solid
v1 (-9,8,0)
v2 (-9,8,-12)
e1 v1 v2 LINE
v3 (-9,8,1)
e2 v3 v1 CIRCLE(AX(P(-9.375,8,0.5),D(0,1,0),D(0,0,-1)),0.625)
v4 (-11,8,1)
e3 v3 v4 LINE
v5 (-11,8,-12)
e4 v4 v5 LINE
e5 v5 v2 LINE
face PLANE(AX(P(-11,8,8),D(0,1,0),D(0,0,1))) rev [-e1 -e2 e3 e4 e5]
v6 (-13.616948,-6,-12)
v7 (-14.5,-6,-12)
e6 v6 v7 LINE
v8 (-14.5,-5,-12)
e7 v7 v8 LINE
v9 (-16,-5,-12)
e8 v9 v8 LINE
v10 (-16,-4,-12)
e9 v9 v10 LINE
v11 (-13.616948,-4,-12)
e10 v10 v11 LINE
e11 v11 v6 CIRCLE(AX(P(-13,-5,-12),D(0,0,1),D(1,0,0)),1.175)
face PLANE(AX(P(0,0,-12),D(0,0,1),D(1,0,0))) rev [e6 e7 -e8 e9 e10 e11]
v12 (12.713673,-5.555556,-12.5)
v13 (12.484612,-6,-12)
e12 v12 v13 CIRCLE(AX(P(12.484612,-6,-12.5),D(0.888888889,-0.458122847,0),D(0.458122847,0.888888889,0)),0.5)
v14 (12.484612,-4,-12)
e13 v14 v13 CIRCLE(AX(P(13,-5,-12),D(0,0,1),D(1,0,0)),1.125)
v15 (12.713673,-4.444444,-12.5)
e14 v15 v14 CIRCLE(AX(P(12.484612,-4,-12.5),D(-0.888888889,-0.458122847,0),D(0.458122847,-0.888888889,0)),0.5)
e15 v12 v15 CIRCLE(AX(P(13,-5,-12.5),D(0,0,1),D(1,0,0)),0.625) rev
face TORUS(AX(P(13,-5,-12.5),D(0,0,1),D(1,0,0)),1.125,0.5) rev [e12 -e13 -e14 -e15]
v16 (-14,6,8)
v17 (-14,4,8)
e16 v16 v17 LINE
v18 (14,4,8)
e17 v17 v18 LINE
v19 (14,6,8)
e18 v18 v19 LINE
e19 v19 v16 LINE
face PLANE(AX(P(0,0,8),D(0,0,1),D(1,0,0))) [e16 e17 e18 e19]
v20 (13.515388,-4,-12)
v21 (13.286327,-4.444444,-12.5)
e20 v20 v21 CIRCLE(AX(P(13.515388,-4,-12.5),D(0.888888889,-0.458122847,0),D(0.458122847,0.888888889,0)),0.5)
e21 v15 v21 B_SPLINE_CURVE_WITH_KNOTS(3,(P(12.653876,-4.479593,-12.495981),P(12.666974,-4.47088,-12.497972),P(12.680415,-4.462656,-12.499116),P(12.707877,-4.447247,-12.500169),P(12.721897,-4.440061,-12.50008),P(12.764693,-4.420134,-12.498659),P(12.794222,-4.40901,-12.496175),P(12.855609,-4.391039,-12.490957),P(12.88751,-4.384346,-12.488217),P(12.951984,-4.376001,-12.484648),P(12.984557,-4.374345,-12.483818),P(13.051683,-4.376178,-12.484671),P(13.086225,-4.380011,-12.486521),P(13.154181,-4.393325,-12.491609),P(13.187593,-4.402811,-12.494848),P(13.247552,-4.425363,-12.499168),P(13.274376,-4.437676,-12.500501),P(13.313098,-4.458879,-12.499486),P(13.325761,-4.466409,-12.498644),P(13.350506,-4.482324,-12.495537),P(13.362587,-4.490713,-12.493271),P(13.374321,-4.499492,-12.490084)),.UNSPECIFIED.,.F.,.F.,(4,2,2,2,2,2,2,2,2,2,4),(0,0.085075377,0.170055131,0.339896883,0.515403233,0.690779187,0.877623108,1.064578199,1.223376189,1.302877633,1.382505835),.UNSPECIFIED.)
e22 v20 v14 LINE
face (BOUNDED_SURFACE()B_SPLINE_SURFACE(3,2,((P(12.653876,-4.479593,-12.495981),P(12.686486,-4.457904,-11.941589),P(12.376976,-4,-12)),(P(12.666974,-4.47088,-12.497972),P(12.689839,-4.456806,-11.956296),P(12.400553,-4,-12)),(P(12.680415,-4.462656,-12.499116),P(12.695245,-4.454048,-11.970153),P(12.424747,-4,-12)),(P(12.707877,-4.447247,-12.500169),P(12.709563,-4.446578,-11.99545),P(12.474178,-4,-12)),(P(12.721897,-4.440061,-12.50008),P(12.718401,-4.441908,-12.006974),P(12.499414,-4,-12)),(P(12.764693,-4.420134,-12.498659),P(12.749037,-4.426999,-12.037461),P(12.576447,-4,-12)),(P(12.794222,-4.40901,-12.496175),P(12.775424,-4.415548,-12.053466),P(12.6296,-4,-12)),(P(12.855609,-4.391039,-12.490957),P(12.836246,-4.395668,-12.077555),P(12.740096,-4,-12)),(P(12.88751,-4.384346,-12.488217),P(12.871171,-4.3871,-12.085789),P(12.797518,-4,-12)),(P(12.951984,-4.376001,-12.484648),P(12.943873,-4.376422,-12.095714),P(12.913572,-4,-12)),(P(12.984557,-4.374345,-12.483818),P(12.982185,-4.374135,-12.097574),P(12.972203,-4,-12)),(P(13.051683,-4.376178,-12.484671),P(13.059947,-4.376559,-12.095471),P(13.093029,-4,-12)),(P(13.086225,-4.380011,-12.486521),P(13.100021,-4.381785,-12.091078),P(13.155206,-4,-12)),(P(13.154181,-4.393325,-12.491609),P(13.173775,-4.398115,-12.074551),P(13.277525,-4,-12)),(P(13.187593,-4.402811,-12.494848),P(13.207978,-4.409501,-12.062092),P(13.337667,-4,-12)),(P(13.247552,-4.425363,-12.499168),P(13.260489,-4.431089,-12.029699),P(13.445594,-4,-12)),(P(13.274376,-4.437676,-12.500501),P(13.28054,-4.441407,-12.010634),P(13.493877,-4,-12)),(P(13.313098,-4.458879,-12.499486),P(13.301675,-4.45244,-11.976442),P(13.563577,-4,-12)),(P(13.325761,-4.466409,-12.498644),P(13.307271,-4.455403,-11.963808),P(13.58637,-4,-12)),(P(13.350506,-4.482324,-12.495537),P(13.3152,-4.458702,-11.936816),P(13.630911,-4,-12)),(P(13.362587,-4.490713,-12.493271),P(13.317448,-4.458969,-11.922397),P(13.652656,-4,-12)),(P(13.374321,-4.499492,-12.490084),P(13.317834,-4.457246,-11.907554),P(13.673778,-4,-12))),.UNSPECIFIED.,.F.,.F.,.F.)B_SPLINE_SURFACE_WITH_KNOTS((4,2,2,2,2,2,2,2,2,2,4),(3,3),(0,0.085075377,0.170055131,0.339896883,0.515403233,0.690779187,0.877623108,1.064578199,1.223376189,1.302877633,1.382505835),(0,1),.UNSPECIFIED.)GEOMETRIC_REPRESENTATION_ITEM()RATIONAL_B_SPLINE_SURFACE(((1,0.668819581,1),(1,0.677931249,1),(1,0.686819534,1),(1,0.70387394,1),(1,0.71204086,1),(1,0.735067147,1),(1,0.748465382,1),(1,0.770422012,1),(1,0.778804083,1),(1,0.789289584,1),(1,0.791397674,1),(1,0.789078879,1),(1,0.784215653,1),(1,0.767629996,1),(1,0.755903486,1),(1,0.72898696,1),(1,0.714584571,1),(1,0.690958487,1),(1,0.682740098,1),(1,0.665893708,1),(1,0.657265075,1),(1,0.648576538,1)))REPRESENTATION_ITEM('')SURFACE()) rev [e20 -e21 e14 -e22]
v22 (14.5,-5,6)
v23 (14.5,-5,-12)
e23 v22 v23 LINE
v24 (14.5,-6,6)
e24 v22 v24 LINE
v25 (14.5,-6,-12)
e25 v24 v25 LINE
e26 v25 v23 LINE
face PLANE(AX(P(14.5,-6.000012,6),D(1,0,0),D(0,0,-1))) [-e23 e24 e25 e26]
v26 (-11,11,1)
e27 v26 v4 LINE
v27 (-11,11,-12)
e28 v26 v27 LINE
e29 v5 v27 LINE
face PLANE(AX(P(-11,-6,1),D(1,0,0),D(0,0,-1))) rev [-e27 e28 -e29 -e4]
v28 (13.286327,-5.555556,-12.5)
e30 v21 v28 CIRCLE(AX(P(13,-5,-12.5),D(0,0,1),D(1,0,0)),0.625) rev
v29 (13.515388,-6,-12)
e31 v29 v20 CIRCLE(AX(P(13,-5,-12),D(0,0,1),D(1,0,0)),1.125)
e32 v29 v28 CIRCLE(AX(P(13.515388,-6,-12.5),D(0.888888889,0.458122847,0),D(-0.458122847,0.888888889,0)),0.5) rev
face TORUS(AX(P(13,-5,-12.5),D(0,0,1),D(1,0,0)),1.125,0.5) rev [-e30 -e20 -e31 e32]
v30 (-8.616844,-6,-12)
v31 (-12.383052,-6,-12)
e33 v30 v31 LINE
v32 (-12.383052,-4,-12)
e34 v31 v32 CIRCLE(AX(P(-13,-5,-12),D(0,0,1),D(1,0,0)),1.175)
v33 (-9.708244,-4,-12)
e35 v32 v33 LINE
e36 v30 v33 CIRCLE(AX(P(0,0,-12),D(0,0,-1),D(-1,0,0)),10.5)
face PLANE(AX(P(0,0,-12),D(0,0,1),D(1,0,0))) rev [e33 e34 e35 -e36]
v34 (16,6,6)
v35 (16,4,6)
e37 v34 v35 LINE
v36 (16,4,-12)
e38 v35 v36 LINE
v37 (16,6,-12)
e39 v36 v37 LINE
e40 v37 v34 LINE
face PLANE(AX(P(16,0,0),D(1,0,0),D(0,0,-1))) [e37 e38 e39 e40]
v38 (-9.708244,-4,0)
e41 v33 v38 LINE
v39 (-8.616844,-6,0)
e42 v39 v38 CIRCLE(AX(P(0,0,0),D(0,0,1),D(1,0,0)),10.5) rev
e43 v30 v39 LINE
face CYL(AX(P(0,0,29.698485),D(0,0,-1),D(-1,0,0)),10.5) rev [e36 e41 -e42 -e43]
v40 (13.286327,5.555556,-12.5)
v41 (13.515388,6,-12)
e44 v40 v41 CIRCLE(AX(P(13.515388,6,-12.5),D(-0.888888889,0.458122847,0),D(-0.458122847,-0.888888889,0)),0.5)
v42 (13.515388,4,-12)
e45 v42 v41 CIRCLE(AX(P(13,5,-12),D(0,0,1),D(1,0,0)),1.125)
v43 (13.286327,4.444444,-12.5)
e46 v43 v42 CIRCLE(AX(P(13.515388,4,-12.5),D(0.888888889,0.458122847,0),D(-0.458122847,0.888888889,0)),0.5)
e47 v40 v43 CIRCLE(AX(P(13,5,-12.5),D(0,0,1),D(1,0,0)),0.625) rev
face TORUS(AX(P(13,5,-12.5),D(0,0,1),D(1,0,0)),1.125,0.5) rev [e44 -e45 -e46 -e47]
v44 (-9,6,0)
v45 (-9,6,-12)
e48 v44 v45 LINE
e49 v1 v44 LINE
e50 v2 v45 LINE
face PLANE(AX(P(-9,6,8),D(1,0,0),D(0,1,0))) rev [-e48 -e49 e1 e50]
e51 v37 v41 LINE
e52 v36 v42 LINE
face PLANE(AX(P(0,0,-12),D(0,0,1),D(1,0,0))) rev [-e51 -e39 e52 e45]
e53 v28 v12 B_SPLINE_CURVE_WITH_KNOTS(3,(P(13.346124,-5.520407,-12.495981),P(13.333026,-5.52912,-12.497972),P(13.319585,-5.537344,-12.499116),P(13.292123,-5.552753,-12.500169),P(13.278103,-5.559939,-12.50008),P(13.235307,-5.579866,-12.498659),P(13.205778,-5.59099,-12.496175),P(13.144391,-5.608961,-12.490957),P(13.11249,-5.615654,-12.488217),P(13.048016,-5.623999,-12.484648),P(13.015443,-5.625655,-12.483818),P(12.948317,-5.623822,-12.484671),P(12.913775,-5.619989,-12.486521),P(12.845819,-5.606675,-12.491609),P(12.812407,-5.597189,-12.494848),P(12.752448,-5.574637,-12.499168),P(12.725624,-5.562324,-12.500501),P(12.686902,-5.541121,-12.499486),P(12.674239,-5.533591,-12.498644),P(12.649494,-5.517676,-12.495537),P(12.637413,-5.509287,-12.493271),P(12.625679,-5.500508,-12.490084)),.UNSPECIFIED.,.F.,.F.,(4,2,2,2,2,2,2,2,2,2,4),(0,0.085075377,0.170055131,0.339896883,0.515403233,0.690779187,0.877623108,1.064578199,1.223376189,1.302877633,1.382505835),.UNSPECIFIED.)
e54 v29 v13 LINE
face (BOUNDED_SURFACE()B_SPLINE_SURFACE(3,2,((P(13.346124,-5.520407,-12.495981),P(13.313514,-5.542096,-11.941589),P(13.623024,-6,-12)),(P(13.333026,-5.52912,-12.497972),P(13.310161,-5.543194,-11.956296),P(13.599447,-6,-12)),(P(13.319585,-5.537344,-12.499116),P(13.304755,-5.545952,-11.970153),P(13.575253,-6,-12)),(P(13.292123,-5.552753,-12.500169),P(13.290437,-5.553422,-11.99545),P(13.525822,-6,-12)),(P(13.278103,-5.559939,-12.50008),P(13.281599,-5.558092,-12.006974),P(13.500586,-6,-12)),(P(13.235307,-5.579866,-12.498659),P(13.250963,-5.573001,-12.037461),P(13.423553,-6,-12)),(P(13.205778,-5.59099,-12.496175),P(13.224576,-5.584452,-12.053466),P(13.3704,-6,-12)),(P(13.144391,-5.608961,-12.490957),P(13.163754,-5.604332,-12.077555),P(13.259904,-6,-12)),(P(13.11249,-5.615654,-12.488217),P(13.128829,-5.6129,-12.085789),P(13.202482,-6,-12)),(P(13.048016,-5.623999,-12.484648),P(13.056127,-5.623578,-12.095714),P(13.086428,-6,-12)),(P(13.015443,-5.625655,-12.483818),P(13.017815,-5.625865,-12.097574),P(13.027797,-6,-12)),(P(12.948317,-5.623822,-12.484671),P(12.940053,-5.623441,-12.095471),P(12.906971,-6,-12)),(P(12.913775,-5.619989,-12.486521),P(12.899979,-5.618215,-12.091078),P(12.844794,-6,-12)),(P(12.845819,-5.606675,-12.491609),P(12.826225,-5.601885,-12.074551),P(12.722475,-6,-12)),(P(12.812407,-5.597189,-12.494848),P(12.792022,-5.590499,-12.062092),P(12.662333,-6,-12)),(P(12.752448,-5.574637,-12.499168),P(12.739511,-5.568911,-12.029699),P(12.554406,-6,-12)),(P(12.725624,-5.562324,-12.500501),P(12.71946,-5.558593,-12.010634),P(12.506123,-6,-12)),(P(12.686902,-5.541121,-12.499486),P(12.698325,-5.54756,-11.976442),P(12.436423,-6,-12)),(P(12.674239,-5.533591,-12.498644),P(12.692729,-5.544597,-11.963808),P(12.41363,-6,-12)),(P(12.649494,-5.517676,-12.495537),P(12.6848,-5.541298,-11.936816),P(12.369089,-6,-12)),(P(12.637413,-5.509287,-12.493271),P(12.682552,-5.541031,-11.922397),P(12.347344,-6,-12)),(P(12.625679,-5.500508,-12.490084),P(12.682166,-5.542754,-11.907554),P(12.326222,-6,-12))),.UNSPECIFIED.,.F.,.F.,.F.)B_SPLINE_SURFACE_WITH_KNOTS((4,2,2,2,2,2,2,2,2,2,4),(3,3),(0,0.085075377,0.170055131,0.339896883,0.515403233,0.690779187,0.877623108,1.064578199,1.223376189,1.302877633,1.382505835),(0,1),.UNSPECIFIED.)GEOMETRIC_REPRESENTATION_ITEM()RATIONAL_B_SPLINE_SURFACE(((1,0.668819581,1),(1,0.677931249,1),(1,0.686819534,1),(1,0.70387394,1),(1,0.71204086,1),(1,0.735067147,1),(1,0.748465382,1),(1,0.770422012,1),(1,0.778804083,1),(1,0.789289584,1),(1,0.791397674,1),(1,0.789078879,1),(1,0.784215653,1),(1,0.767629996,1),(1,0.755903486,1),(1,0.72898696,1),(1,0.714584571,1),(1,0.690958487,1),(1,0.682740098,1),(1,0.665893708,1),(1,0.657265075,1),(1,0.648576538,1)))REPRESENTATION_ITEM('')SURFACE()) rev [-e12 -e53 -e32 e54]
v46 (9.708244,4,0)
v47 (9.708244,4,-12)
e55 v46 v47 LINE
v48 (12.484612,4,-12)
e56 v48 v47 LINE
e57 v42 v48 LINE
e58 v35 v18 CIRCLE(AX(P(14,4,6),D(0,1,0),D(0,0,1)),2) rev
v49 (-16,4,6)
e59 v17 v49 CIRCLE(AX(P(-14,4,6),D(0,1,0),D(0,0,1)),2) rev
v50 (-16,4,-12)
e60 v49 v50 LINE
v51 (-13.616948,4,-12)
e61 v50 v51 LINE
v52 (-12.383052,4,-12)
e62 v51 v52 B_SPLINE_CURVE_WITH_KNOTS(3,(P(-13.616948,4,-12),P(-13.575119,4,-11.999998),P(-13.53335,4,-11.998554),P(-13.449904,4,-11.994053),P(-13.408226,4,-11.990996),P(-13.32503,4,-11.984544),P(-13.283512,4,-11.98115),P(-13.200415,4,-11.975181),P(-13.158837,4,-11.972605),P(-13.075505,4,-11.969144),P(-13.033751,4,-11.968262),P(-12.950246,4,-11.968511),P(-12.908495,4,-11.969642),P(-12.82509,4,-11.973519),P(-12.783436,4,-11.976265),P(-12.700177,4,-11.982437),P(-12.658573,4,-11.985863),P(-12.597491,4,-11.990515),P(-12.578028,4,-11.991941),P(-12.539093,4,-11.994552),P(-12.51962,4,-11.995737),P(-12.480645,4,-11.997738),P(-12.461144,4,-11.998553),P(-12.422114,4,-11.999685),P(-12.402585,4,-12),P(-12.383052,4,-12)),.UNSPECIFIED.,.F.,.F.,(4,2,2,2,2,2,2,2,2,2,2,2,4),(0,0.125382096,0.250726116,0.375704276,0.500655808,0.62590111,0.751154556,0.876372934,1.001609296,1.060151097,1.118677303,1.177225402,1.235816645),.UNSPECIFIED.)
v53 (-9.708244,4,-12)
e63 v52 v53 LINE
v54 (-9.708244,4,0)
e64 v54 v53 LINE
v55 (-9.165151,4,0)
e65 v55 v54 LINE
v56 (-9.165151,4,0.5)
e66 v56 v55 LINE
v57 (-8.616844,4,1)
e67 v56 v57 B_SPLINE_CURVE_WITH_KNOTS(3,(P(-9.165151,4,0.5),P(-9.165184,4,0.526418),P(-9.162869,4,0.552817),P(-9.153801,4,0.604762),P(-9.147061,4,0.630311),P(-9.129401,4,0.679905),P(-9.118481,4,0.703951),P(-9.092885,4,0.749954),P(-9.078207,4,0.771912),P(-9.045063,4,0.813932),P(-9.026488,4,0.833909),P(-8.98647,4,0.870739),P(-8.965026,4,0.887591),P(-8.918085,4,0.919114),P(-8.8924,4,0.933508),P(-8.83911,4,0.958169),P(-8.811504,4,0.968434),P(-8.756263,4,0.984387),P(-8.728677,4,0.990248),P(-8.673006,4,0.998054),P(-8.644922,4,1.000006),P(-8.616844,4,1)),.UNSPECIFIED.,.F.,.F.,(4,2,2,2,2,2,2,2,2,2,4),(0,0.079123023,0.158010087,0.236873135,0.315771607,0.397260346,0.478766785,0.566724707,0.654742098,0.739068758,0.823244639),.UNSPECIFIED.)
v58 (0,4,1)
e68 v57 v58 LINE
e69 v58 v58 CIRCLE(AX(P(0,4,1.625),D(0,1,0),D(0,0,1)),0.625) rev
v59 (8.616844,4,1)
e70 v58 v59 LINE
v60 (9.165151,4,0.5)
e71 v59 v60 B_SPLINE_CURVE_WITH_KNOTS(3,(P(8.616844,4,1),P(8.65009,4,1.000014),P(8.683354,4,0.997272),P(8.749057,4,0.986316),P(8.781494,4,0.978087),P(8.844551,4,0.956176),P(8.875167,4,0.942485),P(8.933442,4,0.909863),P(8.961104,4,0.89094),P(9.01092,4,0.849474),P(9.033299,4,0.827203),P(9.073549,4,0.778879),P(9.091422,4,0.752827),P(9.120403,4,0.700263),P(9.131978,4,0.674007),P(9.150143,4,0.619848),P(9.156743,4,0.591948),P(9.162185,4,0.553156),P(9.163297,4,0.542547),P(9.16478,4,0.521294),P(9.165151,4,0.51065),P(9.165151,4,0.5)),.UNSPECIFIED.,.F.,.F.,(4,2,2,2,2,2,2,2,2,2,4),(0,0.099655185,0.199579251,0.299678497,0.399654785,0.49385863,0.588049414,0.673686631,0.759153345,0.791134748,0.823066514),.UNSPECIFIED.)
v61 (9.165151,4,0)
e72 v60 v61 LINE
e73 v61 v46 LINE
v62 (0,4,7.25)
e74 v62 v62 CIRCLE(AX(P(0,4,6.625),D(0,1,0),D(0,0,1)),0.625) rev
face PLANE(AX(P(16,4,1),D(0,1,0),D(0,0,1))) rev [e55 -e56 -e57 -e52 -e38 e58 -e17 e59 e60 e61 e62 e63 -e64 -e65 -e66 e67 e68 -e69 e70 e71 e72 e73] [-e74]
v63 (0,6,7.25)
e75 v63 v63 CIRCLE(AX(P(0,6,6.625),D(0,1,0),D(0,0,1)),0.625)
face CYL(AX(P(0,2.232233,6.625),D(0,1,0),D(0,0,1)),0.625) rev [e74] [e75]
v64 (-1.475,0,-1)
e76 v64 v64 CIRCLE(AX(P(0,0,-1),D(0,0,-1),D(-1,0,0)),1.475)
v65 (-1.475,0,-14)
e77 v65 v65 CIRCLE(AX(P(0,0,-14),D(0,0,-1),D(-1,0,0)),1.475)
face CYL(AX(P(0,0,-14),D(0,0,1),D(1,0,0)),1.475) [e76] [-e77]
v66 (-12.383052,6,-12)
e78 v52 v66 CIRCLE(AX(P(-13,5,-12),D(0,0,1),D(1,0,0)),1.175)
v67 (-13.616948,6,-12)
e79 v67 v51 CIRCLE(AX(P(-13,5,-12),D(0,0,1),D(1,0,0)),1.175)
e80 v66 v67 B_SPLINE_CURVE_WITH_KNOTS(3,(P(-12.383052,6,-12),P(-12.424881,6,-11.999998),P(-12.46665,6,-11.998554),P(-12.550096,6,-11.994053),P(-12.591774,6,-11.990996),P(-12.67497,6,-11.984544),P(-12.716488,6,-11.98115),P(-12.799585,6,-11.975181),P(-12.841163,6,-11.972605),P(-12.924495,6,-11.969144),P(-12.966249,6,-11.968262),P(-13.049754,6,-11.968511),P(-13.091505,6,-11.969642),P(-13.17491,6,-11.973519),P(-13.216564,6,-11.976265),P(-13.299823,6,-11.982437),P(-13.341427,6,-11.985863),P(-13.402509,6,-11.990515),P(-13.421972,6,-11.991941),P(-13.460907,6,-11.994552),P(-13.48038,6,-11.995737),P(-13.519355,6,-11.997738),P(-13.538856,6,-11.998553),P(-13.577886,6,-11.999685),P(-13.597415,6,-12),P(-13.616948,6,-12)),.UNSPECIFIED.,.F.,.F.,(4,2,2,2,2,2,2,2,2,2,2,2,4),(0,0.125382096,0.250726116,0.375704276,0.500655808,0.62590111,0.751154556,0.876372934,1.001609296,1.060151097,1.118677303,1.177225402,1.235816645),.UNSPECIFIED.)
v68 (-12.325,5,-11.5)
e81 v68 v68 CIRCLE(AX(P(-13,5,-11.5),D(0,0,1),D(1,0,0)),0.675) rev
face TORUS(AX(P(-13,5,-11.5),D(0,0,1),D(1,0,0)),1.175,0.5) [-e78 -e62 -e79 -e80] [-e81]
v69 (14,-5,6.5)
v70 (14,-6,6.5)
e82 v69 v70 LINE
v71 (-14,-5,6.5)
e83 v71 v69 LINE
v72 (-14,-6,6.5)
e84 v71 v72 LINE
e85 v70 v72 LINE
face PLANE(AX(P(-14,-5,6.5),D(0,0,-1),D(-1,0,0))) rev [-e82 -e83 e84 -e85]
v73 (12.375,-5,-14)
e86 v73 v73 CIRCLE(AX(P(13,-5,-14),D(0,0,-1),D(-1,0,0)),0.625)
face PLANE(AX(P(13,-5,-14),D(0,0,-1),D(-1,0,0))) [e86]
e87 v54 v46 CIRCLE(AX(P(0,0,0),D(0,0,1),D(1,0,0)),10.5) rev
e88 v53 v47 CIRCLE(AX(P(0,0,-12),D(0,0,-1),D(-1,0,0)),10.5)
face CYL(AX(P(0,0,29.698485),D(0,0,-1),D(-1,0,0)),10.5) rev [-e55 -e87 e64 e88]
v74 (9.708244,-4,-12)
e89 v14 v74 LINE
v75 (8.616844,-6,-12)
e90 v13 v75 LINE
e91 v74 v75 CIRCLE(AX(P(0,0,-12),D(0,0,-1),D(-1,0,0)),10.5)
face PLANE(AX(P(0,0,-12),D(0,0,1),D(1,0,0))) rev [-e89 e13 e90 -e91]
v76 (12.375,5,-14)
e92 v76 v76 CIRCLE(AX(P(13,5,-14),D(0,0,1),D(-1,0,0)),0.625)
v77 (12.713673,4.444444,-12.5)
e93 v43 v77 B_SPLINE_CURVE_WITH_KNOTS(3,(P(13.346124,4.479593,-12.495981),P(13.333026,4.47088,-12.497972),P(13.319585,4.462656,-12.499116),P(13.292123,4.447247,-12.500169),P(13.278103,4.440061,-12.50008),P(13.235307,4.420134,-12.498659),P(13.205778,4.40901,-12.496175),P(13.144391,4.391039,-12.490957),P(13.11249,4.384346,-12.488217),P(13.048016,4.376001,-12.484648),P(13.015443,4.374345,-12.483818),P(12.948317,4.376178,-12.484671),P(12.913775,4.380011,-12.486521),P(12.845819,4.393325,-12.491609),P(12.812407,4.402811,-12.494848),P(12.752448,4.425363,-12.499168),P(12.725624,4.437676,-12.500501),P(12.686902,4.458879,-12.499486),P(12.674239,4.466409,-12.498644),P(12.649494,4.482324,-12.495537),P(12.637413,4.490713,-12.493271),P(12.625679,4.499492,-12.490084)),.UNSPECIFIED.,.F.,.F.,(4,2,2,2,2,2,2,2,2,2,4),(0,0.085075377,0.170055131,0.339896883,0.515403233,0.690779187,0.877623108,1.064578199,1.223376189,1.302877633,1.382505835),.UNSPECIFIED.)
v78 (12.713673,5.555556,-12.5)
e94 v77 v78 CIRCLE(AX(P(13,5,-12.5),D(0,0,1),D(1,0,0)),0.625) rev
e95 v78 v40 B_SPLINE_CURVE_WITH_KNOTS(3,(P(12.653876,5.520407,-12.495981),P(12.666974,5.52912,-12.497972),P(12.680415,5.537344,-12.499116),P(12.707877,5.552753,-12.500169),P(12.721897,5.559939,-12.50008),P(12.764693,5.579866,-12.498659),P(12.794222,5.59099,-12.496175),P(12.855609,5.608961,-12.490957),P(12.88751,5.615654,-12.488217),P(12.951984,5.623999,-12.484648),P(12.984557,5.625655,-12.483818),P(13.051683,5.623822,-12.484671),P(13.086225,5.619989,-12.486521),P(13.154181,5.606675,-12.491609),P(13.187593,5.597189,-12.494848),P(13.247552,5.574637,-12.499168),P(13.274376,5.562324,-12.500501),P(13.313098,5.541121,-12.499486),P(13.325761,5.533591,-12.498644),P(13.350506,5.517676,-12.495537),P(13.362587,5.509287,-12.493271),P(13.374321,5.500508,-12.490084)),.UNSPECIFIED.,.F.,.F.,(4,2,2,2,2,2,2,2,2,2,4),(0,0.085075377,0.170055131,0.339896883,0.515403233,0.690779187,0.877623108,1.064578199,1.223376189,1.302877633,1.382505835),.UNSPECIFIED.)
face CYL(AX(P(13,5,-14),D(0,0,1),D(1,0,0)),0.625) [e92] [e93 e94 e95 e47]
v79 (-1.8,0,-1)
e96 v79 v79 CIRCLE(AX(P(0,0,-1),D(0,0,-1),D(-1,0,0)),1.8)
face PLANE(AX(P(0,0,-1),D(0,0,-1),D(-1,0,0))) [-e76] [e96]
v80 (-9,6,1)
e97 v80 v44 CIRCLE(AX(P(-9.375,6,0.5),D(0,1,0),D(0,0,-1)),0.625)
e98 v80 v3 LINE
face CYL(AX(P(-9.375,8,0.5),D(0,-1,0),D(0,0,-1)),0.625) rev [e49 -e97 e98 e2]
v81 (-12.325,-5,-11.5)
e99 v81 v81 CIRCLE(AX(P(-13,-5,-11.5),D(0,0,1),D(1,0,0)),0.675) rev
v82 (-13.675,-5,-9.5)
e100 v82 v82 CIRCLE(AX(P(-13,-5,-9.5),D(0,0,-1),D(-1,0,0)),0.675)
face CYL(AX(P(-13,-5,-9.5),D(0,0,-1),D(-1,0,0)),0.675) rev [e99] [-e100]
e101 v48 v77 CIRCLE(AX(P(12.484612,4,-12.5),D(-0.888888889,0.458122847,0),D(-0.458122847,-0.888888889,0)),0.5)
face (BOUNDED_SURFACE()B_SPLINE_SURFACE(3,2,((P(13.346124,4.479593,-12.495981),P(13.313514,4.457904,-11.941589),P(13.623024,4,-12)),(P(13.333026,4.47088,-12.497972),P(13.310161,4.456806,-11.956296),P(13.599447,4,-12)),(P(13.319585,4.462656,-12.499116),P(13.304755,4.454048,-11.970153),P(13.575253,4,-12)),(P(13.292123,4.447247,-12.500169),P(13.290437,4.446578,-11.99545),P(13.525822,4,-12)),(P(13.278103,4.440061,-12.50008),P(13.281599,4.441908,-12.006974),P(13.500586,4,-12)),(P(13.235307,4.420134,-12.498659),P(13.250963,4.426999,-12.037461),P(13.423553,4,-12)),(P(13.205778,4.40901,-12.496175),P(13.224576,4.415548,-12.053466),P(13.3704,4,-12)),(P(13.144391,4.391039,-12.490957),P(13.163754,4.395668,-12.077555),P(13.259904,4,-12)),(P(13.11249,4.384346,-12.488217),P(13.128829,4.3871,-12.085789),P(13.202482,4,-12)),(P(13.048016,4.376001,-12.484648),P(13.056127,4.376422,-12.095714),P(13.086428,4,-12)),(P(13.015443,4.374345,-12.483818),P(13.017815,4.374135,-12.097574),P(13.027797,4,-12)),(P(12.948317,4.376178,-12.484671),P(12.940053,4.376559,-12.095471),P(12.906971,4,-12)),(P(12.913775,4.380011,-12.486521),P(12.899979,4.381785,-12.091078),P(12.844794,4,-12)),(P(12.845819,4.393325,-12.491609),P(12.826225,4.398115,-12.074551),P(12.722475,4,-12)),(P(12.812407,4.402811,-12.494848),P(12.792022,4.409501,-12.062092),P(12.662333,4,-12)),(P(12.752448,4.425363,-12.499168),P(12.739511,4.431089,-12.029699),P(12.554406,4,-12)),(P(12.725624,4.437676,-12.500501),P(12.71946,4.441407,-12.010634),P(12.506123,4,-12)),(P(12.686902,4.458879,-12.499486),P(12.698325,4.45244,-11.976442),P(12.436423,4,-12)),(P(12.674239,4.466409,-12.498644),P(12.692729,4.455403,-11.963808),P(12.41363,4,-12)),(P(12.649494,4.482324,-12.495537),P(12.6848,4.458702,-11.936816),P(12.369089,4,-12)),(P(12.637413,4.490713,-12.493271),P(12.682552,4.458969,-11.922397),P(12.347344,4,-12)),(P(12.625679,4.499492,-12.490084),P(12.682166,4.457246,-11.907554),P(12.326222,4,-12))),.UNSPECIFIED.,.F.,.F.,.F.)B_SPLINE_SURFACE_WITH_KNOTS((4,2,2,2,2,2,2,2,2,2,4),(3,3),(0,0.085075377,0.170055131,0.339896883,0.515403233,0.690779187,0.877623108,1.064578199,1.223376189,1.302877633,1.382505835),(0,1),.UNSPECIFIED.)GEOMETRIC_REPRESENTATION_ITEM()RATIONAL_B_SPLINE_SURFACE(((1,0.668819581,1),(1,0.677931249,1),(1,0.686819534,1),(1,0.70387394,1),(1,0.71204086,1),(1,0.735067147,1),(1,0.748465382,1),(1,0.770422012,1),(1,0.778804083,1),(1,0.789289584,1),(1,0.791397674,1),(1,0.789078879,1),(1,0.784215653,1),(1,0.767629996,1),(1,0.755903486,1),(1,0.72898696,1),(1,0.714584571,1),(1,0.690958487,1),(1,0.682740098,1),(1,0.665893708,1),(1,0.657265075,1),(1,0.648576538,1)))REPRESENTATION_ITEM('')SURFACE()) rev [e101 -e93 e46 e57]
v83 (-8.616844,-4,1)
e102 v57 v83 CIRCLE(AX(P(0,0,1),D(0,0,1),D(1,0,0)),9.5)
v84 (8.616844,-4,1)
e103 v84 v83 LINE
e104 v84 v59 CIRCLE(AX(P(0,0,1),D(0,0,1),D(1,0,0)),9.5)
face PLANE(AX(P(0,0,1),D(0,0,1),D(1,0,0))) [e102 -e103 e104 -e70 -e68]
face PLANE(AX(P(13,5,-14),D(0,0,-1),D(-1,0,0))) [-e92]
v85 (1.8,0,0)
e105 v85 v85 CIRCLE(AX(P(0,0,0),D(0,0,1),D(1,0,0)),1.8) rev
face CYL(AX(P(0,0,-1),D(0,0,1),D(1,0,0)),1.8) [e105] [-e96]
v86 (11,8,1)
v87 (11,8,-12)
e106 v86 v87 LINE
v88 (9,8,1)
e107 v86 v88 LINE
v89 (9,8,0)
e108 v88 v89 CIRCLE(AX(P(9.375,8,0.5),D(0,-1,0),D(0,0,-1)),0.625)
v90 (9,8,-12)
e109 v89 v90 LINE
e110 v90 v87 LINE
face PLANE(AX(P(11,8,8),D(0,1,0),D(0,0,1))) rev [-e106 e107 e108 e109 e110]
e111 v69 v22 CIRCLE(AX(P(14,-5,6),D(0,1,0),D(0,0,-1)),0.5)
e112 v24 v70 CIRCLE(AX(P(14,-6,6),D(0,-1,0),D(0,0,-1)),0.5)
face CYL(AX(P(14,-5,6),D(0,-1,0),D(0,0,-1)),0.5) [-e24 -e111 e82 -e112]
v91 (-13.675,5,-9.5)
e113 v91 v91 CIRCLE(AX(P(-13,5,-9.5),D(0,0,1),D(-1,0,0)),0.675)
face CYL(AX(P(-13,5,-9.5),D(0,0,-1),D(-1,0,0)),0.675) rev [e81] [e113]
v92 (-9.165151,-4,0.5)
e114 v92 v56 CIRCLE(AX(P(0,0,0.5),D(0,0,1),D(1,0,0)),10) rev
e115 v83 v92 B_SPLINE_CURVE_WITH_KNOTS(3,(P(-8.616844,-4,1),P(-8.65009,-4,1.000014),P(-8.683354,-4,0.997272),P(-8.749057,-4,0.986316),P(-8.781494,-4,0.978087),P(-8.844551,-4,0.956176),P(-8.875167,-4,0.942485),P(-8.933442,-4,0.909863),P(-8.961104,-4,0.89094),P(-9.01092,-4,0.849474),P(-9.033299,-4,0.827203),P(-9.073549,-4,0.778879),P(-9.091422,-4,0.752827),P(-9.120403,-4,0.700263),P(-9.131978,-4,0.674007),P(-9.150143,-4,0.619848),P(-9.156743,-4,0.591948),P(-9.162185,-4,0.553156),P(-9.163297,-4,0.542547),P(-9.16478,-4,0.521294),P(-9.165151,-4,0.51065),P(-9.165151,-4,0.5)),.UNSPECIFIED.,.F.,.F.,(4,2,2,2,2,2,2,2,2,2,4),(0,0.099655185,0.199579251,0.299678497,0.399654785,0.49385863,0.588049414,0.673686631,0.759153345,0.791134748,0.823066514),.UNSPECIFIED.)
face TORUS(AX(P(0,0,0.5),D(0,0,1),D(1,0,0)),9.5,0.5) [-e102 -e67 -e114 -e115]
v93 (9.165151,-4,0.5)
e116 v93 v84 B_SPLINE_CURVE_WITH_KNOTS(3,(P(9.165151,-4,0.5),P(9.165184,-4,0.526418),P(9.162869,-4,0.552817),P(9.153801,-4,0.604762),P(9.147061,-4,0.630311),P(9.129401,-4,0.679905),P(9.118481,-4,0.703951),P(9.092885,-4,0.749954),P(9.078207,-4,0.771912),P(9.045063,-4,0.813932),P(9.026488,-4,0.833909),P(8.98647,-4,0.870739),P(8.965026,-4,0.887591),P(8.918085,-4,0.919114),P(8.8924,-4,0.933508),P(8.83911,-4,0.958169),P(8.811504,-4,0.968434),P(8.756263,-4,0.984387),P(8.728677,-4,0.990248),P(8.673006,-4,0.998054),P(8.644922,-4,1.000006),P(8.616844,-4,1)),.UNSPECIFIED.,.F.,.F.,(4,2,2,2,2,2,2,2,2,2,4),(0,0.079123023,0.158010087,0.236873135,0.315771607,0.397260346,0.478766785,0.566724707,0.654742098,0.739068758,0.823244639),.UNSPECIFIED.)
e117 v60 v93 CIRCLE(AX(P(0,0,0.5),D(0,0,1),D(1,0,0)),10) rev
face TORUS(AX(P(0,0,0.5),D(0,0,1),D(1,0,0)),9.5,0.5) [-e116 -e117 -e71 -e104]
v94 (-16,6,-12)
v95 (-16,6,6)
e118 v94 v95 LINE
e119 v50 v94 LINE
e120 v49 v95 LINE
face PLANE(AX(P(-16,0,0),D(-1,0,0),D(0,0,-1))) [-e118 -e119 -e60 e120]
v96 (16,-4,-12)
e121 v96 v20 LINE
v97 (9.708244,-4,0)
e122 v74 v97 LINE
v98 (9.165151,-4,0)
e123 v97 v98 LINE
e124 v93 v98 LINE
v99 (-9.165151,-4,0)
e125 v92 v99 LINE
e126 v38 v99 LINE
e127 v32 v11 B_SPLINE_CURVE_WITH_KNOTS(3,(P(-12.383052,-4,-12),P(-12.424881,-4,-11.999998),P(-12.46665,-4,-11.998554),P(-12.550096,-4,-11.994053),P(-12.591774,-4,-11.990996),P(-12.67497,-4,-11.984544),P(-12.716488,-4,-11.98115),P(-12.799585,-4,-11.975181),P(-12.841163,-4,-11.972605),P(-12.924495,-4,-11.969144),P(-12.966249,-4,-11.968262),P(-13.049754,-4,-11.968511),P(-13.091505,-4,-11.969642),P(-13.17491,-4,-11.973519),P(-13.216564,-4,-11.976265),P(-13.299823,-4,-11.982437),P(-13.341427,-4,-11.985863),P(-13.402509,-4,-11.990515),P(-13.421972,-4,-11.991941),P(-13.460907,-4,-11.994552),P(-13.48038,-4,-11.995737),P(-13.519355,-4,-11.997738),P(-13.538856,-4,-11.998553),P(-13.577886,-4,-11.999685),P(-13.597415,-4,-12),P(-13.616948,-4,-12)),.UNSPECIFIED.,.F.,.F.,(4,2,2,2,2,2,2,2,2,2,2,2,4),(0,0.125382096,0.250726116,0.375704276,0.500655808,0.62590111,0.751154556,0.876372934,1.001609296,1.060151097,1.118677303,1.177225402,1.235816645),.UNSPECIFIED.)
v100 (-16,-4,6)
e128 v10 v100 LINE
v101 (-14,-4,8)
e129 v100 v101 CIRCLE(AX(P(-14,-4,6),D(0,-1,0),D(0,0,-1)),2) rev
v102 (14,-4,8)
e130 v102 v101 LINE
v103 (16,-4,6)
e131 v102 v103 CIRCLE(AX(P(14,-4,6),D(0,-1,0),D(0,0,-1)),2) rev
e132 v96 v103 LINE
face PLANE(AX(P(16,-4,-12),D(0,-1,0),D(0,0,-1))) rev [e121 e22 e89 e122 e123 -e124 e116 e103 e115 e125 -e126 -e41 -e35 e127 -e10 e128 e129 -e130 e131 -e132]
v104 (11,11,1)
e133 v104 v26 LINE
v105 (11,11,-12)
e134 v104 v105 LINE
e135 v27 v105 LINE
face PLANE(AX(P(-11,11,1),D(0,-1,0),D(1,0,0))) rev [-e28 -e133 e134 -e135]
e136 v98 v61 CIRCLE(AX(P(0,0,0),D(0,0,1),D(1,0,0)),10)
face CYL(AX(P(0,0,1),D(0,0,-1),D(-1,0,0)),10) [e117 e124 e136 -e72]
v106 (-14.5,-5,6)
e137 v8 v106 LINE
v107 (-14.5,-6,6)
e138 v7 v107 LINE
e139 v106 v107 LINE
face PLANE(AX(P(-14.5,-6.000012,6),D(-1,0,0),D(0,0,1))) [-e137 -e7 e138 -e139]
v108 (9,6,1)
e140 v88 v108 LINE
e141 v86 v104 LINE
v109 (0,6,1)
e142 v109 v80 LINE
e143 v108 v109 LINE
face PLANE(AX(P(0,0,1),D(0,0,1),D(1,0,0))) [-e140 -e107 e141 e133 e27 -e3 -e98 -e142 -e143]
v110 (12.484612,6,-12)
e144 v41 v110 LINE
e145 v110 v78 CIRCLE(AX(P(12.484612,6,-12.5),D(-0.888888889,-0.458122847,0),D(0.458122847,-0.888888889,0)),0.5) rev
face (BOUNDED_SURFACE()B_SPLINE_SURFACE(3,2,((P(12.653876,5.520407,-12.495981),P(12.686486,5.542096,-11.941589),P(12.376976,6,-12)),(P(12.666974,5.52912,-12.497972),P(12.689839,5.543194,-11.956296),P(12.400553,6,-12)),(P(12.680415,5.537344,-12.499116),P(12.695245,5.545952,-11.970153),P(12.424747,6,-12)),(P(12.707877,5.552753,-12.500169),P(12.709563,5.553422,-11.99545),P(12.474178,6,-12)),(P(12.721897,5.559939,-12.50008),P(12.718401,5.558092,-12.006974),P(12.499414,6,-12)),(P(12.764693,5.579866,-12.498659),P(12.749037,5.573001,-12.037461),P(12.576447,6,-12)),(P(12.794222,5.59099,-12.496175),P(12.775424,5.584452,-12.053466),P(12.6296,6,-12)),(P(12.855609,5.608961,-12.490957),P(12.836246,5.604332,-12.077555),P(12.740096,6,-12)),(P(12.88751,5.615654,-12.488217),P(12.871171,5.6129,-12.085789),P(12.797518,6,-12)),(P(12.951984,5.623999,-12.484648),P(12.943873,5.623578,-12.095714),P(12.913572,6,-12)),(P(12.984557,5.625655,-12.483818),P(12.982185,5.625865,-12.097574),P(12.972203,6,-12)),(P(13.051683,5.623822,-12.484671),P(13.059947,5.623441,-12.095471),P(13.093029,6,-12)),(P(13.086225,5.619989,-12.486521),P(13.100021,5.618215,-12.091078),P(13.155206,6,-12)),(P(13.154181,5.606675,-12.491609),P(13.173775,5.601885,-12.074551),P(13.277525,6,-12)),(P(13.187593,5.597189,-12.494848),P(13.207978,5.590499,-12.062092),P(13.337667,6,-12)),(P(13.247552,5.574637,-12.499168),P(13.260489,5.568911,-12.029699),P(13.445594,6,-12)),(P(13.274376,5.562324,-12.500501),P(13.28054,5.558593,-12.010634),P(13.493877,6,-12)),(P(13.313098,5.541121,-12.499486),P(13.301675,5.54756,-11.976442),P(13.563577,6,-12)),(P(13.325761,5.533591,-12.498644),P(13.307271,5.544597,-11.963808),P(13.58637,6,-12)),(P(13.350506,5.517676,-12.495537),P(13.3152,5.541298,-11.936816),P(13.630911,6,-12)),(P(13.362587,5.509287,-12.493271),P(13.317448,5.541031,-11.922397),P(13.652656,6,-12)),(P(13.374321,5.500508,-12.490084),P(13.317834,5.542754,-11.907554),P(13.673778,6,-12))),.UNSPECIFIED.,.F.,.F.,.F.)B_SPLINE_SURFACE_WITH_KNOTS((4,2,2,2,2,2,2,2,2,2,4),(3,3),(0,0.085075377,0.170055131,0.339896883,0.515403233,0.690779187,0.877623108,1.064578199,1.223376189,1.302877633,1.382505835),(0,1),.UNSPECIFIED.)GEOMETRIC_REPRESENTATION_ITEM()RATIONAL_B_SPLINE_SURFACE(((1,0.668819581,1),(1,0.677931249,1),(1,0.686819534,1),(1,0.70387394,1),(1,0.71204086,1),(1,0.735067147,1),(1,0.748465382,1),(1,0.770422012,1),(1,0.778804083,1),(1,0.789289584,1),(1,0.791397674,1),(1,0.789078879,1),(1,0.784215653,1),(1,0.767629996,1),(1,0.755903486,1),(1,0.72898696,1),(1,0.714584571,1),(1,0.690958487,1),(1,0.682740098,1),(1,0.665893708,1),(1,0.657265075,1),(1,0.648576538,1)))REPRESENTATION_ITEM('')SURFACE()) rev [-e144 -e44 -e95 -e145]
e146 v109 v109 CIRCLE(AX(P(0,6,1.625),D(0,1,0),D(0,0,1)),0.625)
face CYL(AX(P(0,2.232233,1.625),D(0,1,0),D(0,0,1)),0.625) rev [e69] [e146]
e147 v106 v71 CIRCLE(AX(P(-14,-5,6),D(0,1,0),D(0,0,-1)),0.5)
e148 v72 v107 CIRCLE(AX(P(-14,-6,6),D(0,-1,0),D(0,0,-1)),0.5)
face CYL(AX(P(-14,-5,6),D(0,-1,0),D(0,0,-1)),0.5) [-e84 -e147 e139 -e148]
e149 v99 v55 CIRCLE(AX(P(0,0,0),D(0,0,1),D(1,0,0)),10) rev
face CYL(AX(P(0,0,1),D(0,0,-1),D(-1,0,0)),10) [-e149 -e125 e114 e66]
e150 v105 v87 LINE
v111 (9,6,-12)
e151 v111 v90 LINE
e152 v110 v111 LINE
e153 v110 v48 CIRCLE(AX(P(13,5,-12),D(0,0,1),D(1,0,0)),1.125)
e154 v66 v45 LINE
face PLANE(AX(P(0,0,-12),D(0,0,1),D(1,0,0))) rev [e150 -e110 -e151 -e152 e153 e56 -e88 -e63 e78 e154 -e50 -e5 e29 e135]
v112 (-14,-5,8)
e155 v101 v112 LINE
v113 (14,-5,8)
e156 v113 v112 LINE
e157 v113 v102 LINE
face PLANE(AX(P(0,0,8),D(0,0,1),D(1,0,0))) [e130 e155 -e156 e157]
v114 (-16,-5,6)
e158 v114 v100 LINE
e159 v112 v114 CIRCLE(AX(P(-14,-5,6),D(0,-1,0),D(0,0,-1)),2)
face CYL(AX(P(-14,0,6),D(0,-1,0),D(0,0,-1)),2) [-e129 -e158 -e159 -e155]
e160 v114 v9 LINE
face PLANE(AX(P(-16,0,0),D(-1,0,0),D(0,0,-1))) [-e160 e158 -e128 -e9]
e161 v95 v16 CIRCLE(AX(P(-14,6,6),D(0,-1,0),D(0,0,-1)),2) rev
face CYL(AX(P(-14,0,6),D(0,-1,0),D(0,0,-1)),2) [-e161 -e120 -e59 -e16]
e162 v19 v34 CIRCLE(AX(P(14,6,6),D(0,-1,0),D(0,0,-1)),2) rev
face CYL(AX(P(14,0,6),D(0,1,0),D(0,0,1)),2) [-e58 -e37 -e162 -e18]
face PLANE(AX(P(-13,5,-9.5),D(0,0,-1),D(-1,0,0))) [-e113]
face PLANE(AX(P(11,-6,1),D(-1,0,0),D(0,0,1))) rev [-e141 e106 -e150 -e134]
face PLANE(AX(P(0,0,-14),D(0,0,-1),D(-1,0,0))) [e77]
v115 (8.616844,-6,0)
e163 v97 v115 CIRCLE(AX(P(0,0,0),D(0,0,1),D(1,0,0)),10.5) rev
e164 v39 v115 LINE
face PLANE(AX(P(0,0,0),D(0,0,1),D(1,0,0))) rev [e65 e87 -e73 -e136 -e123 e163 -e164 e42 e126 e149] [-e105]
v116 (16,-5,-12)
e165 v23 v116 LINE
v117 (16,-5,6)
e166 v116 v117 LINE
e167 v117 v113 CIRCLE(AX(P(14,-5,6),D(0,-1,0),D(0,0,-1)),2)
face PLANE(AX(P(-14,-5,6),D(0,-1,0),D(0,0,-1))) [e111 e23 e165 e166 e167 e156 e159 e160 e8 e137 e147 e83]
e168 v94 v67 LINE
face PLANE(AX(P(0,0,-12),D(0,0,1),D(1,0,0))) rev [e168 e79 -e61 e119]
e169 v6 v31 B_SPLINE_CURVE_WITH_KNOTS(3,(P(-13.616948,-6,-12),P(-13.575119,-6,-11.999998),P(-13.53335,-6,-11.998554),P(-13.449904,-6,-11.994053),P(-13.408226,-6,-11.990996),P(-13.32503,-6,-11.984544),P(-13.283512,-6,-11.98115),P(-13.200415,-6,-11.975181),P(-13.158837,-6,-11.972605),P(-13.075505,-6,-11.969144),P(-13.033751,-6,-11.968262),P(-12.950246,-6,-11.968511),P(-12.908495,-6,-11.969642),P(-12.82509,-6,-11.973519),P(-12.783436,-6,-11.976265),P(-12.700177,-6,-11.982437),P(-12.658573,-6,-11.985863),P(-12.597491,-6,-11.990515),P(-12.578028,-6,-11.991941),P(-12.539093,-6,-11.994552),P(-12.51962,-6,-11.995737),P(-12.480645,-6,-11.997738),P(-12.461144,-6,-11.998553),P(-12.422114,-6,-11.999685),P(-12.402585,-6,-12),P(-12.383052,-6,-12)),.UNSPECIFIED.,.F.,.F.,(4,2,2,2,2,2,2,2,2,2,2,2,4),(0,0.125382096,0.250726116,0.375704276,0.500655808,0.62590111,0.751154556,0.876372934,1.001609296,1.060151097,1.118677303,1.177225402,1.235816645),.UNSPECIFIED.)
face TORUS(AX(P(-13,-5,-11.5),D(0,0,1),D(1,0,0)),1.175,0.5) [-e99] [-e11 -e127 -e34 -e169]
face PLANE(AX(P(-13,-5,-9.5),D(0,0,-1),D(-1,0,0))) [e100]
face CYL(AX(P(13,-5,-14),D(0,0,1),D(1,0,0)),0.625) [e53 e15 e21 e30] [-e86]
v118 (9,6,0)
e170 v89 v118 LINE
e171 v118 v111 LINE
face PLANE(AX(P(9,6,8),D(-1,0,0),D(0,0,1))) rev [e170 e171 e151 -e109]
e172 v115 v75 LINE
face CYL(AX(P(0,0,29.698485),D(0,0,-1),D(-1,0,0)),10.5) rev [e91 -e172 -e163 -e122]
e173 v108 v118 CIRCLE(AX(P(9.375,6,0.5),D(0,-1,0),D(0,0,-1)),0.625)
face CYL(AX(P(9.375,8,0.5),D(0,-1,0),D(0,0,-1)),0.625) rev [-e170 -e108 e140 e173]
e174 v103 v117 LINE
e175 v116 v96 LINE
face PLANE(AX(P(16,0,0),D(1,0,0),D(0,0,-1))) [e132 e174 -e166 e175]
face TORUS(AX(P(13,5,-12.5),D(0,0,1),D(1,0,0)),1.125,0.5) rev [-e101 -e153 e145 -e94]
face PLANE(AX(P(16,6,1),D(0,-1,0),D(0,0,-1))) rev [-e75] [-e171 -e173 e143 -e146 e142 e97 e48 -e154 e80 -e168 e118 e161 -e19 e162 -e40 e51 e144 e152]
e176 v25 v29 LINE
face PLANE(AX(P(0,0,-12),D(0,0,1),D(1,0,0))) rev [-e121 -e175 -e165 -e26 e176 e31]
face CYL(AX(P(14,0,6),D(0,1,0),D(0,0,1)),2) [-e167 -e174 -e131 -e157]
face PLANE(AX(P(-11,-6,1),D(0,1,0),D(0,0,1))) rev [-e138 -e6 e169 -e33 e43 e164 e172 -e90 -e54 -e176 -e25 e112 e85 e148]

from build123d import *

# Parameters (mm, degrees)
BOSS_EXTRUDE1_DEPTH     = 1
SKETCH2_R               = 1.475
BOSS_EXTRUDE2_DEPTH     = 14
SKETCH3_R               = 1.8
BOSS_EXTRUDE3_DEPTH     = 1
SKETCH4_W               = 2
SKETCH4_H               = 17
BOSS_EXTRUDE4_DEPTH     = 12
SKETCH5_W               = 18
SKETCH5_H               = 2
BOSS_EXTRUDE5_DEPTH     = 12
SKETCH6_W               = 13
SKETCH6_H               = 2
BOSS_EXTRUDE6_DEPTH     = 5
BOSS_EXTRUDE7_DEPTH     = 12
CUT_EXTRUDE1_DEPTH      = 24.366642891
SKETCH9_W               = 2.937742252
SKETCH9_H               = 8
CUT_EXTRUDE2_DEPTH      = 12
CUT_EXTRUDE11_START     = -12
SKETCH21_R              = 10.5
SKETCH21_R_2            = 1.8
CUT_EXTRUDE11_DEPTH     = 12
SKETCH10_W              = 32
SKETCH10_H              = 2
BOSS_EXTRUDE8_DEPTH     = 7
FILLET1_R               = 0.5
SKETCH11_R              = 0.625
BOSS_EXTRUDE9_DEPTH     = 2
SKETCH14_W              = 2
SKETCH14_H              = 2
CUT_EXTRUDE5_DEPTH      = 28.874719859
SKETCH12_R              = 0.675
CUT_EXTRUDE3_DEPTH      = 2.5
CUT_EXTRUDE6_DEPTH      = 2
FILLET2_R               = 0.5
FILLET3_R               = 0.5
FILLET4_R               = 2
CUT_EXTRUDE7_DEPTH      = 28.221315288
CUT_EXTRUDE7_DEPTH_BACK = 1
SKETCH19_R              = 0.625
CUT_EXTRUDE9_DEPTH      = 2


with BuildPart() as part:
    # Sketch1 → Boss-Extrude1 (new body)
    with BuildSketch(Plane.XY):
        Polygon((-11, 6), (-11, 11), (11, 11), (11, 6), (11, -6), (-11, -6), align=None)
    extrude(amount=BOSS_EXTRUDE1_DEPTH)

    # Sketch2 → Boss-Extrude2 (add)
    with BuildSketch(Plane(origin=(0, 0, 0), x_dir=(-1, 0, 0), z_dir=(0, 0, -1))):
        with Locations(Location((0, 0, 0), (0, 0, 180))):
            Circle(SKETCH2_R)
    extrude(amount=BOSS_EXTRUDE2_DEPTH)

    # Sketch3 → Boss-Extrude3 (add)
    with BuildSketch(Plane(origin=(0, 0, 0), x_dir=(-1, 0, 0), z_dir=(0, 0, -1))):
        with Locations(Location((0, 0, 0), (0, 0, 180))):
            Circle(SKETCH3_R)
    extrude(amount=BOSS_EXTRUDE3_DEPTH)

    # Sketch4 → Boss-Extrude4 (add)
    with BuildSketch(Plane(origin=(0, 0, 0), x_dir=(-1, 0, 0), z_dir=(0, 0, -1))):
        with Locations((10, 2.5)):
            Rectangle(SKETCH4_W, SKETCH4_H)
        with Locations((-10, 2.5)):
            Rectangle(SKETCH4_W, SKETCH4_H)
    extrude(amount=BOSS_EXTRUDE4_DEPTH)

    # Sketch5 → Boss-Extrude5 (add)
    with BuildSketch(Plane(origin=(0, 0, 0), x_dir=(-1, 0, 0), z_dir=(0, 0, -1))):
        with Locations((0, 10)):
            Rectangle(SKETCH5_W, SKETCH5_H)
    extrude(amount=BOSS_EXTRUDE5_DEPTH)

    # Sketch6 → Boss-Extrude6 (add)
    with BuildSketch(Plane(origin=(11, 0, 0), x_dir=(0, 0, -1), z_dir=(1, 0, 0))):
        with Locations((5.5, -5)):
            Rectangle(SKETCH6_W, SKETCH6_H)
        with Locations((5.5, 5)):
            Rectangle(SKETCH6_W, SKETCH6_H)
    boss_extrude6 = extrude(amount=BOSS_EXTRUDE6_DEPTH)

    # Mirror1: Boss-Extrude6 across plane
    add(boss_extrude6.mirror(Plane(origin=(0, 0, 0), x_dir=(0, 0, 1), z_dir=(1, 0, 0))))

    # Sketch7 → Boss-Extrude7 (add)
    with BuildSketch(Plane(origin=(0, 0, -12), x_dir=(-1, 0, 0), z_dir=(0, 0, -1))):
        with BuildLine():
            ThreePointArc((-6.708203932, -6), (-8.407551231, -3.211398808), (-9, 0))
            Line((-9, 0), (-9, -6))
            Line((-9, -6), (-6.708203932, -6))
        make_face()
        with BuildLine():
            Line((-9, 9), (-9, 0))
            ThreePointArc((-9, 0), (-6.363961031, 6.363961031), (0, 9))
            Line((0, 9), (-9, 9))
        make_face()
    boss_extrude7 = extrude(amount=-BOSS_EXTRUDE7_DEPTH)

    # Sketch8 → Cut-Extrude1 (cut, through all)
    with BuildSketch(Plane(origin=(0, 0, -12), x_dir=(-1, 0, 0), z_dir=(0, 0, -1))):
        with BuildLine():
            Line((-11, 4), (-9.16515139, 4))
            ThreePointArc((-9.16515139, 4), (-10, 0), (-9.16515139, -4))
            Line((-9.16515139, -4), (-11, -4))
            Line((-11, -4), (-11, 4))
        make_face()
    cut_extrude1 = extrude(amount=-CUT_EXTRUDE1_DEPTH, mode=Mode.SUBTRACT)

    # Sketch9 → Cut-Extrude2 (cut)
    with BuildSketch(Plane(origin=(0, 0, -12), x_dir=(-1, 0, 0), z_dir=(0, 0, -1))):
        with Locations((-9.531128874, 0)):
            Rectangle(SKETCH9_W, SKETCH9_H)
    cut_extrude2 = extrude(amount=-CUT_EXTRUDE2_DEPTH, mode=Mode.SUBTRACT)

    # Mirror2: Boss-Extrude7, Cut-Extrude1, Cut-Extrude2 across plane
    add(boss_extrude7.mirror(Plane(origin=(0, 0, 0), x_dir=(0, 0, 1), z_dir=(1, 0, 0))))
    add(cut_extrude1.mirror(Plane(origin=(0, 0, 0), x_dir=(0, 0, 1), z_dir=(1, 0, 0))), mode=Mode.SUBTRACT)
    add(cut_extrude2.mirror(Plane(origin=(0, 0, 0), x_dir=(0, 0, 1), z_dir=(1, 0, 0))), mode=Mode.SUBTRACT)

    # Sketch21 → Cut-Extrude11 (cut)
    with BuildSketch(Plane(origin=(0, 0, -12), x_dir=(-1, 0, 0), z_dir=(0, 0, -1)).offset(CUT_EXTRUDE11_START)):
        Circle(SKETCH21_R)
        with Locations(Location((0, 0, 0), (0, 0, 180))):
            Circle(SKETCH21_R_2, mode=Mode.SUBTRACT)
    extrude(amount=CUT_EXTRUDE11_DEPTH, mode=Mode.SUBTRACT)

    # Sketch10 → Boss-Extrude8 (add)
    with BuildSketch(Plane.XY.offset(1)):
        with Locations((0, -5)):
            Rectangle(SKETCH10_W, SKETCH10_H)
        with Locations((0, 5)):
            Rectangle(SKETCH10_W, SKETCH10_H)
    extrude(amount=BOSS_EXTRUDE8_DEPTH)

    # Fillet1
    fillet1_edges = [part.edges().sort_by_distance(p)[0] for p in [
        (10, 0, 1),
        (-10, 0, 1),
    ]]
    fillet(fillet1_edges, radius=FILLET1_R)

    # Sketch11 → Boss-Extrude9 (add)
    with BuildSketch(Plane(origin=(0, 0, -12), x_dir=(-1, 0, 0), z_dir=(0, 0, -1))):
        with Locations(Location((-13, -5, 0), (0, 0, 180))):
            Circle(SKETCH11_R)
    boss_extrude9 = extrude(amount=BOSS_EXTRUDE9_DEPTH)

    # Sketch14 → Cut-Extrude5 (cut, through all)
    with BuildSketch(Plane(origin=(0, 0, -12), x_dir=(-1, 0, 0), z_dir=(0, 0, -1))):
        with Locations((10, 7)):
            Rectangle(SKETCH14_W, SKETCH14_H)
        with Locations((-10, 7)):
            Rectangle(SKETCH14_W, SKETCH14_H)
    extrude(amount=-CUT_EXTRUDE5_DEPTH, mode=Mode.SUBTRACT)

    # Sketch12 → Cut-Extrude3 (cut)
    with BuildSketch(Plane(origin=(0, 0, -12), x_dir=(-1, 0, 0), z_dir=(0, 0, -1))):
        with Locations((13, -5)):
            Circle(SKETCH12_R)
    cut_extrude3 = extrude(amount=-CUT_EXTRUDE3_DEPTH, mode=Mode.SUBTRACT)

    # Sketch16 → Cut-Extrude6 (cut)
    with BuildSketch(Plane(origin=(0, 6, 0), x_dir=(1, 0, 0), z_dir=(0, 1, 0))):
        with BuildLine():
            Line((-9, 0), (-9, -1))
            ThreePointArc((-9, -1), (-8.75, -0.5), (-9, 0))
        make_face()
    cut_extrude6 = extrude(amount=CUT_EXTRUDE6_DEPTH, mode=Mode.SUBTRACT)

    # Mirror3: Boss-Extrude9, Cut-Extrude3 across plane
    add(boss_extrude9.mirror(Plane.ZX))
    add(cut_extrude3.mirror(Plane.ZX), mode=Mode.SUBTRACT)

    # Mirror4: Cut-Extrude6 across plane
    add(cut_extrude6.mirror(Plane(origin=(0, 0, 0), x_dir=(0, 0, 1), z_dir=(1, 0, 0))), mode=Mode.SUBTRACT)

    # Fillet2
    fillet2_edges = [part.edges().sort_by_distance(p)[0] for p in [
        (12.375, -5, -12),
        (12.375, 5, -12),
    ]]
    fillet(fillet2_edges, radius=FILLET2_R)

    # Fillet3
    # the kernel refuses this fillet: 0.5 mm, written as the material it takes off along each edge
    with BuildSketch(Plane(origin=(-13, -5, -12), x_dir=(-1, 0, 0), z_dir=(0, -1, 0))) as fillet3_piece_1:
        with BuildLine():
            CenterArc((0.675 + FILLET3_R, -FILLET3_R), FILLET3_R, 90, 90)
            Line((0.675, -FILLET3_R), (0.675, 0))
            Line((0.675, 0), (0.675 + FILLET3_R, 0))
        make_face()
    revolve(axis=Axis((-13, -5, -12), (0, 0, -1)), mode=Mode.SUBTRACT)
    with BuildSketch(Plane(origin=(-13, 5, -12), x_dir=(-1, 0, 0), z_dir=(0, 1, 0))) as fillet3_piece_2:
        with BuildLine():
            CenterArc((0.675 + FILLET3_R, FILLET3_R), FILLET3_R, 180, 90)
            Line((0.675, FILLET3_R), (0.675, 0))
            Line((0.675, 0), (0.675 + FILLET3_R, 0))
        make_face()
    revolve(axis=Axis((-13, 5, -12), (0, 0, 1)), mode=Mode.SUBTRACT)

    # Fillet4
    fillet4_edges = [part.edges().sort_by_distance(p)[0] for p in [
        (16, -5, 8),
        (-16, -5, 8),
        (-16, 5, 8),
        (16, 5, 8),
    ]]
    fillet(fillet4_edges, radius=FILLET4_R)

    # Sketch17 → Cut-Extrude7 (cut, two sides: drawn at the far end of the back side and taken through both)
    with BuildSketch(Plane.XZ.offset(6).offset(-CUT_EXTRUDE7_DEPTH_BACK)):
        with BuildLine():
            Line((-16, 6), (-16, -12))
            Line((-16, -12), (-14.5, -12))
            Line((-14.5, -12), (-14.5, 6))
            ThreePointArc((-14.5, 6), (-14.353553391, 6.353553391), (-14, 6.5))
            Line((-14, 6.5), (14, 6.5))
            ThreePointArc((14, 6.5), (14.353553391, 6.353553391), (14.5, 6))
            Line((14.5, 6), (14.5, -12))
            Line((14.5, -12), (16, -12))
            Line((16, -12), (16, 6))
            ThreePointArc((16, 6), (15.414213562, 7.414213562), (14, 8))
            Line((14, 8), (-14, 8))
            ThreePointArc((-14, 8), (-15.414213562, 7.414213562), (-16, 6))
        make_face()
    extrude(amount=CUT_EXTRUDE7_DEPTH + CUT_EXTRUDE7_DEPTH_BACK, mode=Mode.SUBTRACT)

    # Sketch19 → Cut-Extrude9 (cut)
    with BuildSketch(Plane(origin=(0, 6, 0), x_dir=(1, 0, 0), z_dir=(0, 1, 0))):
        with Locations(Location((0, -1.625, 0), (0, 0, 90))):
            Circle(SKETCH19_R)
        with Locations(Location((0, -6.625, 0), (0, 0, 270))):
            Circle(SKETCH19_R)
    extrude(amount=-CUT_EXTRUDE9_DEPTH, mode=Mode.SUBTRACT)


solid = part.part
